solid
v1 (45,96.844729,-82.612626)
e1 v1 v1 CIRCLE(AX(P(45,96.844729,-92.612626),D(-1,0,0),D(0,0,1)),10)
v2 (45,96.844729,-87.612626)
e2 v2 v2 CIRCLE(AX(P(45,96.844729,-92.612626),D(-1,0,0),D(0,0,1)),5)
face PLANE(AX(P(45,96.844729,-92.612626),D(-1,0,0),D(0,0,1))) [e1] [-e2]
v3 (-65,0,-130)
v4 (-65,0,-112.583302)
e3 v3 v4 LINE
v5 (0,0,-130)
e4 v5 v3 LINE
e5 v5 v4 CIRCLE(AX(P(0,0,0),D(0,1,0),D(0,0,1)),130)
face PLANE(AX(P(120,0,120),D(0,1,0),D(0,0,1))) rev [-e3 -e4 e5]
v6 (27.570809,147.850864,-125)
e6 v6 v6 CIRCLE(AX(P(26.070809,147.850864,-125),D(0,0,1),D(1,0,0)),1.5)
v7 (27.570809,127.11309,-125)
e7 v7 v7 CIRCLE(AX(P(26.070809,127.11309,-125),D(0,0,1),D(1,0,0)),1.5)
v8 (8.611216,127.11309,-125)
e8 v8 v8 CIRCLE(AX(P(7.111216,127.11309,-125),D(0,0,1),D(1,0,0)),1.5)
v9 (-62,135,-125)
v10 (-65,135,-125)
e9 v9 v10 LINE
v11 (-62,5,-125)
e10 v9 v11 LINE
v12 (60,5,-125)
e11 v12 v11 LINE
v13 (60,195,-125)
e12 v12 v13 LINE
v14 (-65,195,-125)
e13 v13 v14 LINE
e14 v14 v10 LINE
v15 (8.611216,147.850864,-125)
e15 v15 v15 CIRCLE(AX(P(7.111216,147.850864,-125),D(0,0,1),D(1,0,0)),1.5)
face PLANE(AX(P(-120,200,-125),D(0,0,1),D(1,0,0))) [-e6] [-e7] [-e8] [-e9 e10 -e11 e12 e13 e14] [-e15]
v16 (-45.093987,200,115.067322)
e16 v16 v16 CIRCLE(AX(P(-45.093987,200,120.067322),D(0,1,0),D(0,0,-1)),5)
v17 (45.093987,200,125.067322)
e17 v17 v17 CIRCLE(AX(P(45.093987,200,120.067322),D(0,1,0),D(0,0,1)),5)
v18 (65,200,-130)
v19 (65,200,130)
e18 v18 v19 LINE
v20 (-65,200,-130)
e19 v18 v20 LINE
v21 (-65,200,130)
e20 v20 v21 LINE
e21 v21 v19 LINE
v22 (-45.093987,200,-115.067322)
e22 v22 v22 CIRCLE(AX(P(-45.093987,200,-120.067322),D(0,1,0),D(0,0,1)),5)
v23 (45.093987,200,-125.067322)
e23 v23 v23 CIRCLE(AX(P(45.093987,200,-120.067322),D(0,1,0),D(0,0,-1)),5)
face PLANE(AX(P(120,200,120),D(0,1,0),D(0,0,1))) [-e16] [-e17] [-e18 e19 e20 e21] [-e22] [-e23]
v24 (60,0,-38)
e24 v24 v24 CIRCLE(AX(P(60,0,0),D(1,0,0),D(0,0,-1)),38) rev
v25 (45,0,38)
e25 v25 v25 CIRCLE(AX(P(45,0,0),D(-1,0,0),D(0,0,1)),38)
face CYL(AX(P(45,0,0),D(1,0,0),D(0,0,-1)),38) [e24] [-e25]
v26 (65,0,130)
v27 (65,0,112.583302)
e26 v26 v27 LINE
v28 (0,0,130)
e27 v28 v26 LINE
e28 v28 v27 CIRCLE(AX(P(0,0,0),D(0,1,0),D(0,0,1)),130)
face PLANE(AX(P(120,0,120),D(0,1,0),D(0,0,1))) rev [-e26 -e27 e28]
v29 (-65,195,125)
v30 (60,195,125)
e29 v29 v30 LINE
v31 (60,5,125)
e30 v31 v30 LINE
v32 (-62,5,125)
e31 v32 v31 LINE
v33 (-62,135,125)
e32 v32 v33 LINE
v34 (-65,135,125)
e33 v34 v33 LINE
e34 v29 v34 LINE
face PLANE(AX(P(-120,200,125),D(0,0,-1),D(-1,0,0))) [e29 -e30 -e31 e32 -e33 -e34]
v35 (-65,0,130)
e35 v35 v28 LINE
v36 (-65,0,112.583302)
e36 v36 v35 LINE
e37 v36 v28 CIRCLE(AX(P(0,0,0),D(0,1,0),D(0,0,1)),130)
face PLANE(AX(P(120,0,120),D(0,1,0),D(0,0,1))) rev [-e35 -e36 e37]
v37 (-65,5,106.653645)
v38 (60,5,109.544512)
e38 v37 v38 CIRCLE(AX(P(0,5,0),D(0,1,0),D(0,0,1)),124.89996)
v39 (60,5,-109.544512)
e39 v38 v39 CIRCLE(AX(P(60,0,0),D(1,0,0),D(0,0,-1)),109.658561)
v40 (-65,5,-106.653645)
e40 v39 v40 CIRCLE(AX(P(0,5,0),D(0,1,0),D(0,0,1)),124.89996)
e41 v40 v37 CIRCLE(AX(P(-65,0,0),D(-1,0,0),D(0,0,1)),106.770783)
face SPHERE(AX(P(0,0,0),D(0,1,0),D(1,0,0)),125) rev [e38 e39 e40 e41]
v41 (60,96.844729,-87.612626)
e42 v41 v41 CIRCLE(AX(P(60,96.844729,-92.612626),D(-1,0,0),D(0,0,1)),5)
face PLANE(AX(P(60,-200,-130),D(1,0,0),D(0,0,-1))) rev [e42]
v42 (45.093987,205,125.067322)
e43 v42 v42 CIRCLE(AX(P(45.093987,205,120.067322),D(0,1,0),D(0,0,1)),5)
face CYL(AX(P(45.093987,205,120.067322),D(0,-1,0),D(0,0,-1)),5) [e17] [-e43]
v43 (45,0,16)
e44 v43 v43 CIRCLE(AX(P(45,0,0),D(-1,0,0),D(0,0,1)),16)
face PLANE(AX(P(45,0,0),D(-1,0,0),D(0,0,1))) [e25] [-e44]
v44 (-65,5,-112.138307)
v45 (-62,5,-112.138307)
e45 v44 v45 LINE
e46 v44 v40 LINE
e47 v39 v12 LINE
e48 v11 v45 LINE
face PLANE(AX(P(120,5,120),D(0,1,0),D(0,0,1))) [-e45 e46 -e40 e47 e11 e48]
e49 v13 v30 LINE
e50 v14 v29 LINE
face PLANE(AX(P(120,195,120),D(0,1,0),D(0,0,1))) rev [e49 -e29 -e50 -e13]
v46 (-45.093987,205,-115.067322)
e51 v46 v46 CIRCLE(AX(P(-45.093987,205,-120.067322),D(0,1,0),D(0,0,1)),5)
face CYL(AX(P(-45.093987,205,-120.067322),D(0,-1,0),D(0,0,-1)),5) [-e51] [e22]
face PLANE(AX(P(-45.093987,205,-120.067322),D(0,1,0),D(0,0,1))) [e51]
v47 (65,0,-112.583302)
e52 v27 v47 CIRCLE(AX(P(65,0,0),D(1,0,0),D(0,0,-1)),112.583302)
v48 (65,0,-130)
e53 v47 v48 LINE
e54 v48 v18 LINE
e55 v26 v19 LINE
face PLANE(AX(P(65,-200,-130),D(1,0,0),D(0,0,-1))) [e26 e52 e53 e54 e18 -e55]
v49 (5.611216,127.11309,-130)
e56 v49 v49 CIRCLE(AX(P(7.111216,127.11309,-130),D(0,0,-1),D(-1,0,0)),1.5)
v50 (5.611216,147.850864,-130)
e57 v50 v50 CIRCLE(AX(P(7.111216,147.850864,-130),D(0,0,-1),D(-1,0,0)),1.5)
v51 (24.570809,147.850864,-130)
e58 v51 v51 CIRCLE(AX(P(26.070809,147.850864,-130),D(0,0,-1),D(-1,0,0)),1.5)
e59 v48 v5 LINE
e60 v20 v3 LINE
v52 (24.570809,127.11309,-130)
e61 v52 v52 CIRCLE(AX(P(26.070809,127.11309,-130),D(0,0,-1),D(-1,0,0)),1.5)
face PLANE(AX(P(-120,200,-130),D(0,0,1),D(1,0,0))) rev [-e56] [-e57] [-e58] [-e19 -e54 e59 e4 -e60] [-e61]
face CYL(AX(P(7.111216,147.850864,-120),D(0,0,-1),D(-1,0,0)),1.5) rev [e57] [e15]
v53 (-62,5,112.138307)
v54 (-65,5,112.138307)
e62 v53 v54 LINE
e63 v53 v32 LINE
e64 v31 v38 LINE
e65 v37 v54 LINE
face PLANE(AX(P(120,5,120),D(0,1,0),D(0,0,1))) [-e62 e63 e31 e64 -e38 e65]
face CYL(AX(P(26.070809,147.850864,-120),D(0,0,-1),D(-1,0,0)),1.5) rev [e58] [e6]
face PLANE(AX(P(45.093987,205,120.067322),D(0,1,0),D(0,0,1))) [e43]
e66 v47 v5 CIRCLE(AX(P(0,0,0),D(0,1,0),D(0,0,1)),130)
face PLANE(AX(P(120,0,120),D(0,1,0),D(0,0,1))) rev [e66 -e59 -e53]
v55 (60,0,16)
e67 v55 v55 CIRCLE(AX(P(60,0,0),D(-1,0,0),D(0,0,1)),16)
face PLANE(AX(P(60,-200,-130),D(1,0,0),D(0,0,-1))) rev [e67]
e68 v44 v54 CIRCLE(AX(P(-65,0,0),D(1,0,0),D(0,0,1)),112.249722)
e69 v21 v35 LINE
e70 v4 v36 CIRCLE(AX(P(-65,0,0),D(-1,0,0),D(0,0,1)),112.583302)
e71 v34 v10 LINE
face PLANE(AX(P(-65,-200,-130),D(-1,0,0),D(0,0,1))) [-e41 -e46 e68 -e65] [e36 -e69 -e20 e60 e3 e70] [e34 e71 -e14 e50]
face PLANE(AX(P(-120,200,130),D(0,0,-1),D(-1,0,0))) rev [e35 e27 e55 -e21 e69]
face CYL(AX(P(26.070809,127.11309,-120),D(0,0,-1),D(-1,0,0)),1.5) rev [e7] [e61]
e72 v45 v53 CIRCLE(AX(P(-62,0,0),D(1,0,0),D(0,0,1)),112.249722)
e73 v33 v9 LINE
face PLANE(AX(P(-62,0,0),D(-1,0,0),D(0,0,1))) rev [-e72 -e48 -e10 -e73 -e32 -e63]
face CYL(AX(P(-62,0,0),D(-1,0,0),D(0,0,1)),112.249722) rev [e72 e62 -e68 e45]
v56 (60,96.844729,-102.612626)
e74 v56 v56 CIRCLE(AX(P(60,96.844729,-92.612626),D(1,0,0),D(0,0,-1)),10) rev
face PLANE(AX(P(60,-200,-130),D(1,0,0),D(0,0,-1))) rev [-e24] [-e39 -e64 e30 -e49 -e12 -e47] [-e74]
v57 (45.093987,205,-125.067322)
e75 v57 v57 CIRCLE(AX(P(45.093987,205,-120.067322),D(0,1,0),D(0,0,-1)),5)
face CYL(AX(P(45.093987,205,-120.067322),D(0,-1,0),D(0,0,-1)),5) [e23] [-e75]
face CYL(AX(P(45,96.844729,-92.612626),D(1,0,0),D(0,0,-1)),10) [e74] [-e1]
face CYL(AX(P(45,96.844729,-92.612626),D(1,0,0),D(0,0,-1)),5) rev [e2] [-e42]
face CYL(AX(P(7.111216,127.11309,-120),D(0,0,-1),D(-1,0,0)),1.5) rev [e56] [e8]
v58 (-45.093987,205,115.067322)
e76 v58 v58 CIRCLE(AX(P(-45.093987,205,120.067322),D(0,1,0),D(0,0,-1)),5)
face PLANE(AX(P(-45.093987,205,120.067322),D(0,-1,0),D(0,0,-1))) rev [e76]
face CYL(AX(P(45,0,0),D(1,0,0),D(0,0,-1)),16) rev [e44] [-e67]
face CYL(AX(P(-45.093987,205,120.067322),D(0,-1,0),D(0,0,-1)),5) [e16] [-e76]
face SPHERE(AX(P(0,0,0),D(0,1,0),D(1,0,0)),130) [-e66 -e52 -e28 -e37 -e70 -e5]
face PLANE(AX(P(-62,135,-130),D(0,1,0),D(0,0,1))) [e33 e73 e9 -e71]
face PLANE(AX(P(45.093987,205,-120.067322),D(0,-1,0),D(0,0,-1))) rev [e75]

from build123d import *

# Parameters (mm, degrees)
EXTRUDE_1_DEPTH           = 200
CUT_EXTRUDE_START         = -130
CUT_EXTRUDE_1_OUTLINE_W   = 315
CUT_EXTRUDE_1_OUTLINE_H   = 262
CUT_EXTRUDE_1_DEPTH       = 65
CUT_EXTRUDE_START_2       = 65
CUT_EXTRUDE_1_2_OUTLINE_W = 315
CUT_EXTRUDE_1_2_OUTLINE_H = 262
CUT_EXTRUDE_1_2_DEPTH     = 65
SHELL_START               = 5
SHELL_1_OUTLINE_W         = 125
SHELL_1_OUTLINE_H         = 250
SHELL_1_DEPTH             = 190
EXTRUDE_7_DEPTH           = 3
SKETCH_5_R                = 5
EXTRUDE_8_DEPTH           = 5
SKETCH_6_R                = 38
SKETCH_6_R_2              = 16
EXTRUDE_9_DEPTH           = 15
SKETCH_7_R                = 10
SKETCH_7_R_2              = 5
EXTRUDE_10_DEPTH          = 15
SKETCH_8_R                = 1.5
CUT_EXTRUDE_2_DEPTH       = 10


with BuildPart() as part:
    # 草图1 → 旋转1 (revolve)
    with BuildSketch(Plane.XY):
        with BuildLine():
            Line((0, 130), (0, -130))
            ThreePointArc((0, -130), (130, 0), (0, 130))
        make_face()
    revolve(axis=Axis((0, 130, 0), (0, -1, 0)))

    # 草图3 → 凸台-拉伸1 (add)
    with BuildSketch(Plane(origin=(0, 0, 0), x_dir=(1, 0, 0), z_dir=(0, 1, 0))):
        with BuildLine():
            Line((-120, -130), (120, -130))
            ThreePointArc((120, -130), (127.071067812, -127.071067812), (130, -120))
            Line((130, -120), (130, 120))
            ThreePointArc((130, 120), (127.071067812, 127.071067812), (120, 130))
            Line((120, 130), (-120, 130))
            ThreePointArc((-120, 130), (-127.071067812, 127.071067812), (-130, 120))
            Line((-130, 120), (-130, -120))
            ThreePointArc((-130, -120), (-127.071067812, -127.071067812), (-120, -130))
        make_face()
    extrude(amount=EXTRUDE_1_DEPTH)

    # 切除-拉伸1: read off the stored shape, not the designer's step
    # 切除-拉伸1 outline → 切除-拉伸1 (cut)
    with BuildSketch(Plane.YZ.offset(CUT_EXTRUDE_START)):
        with Locations((43.5, 0)):
            Rectangle(CUT_EXTRUDE_1_OUTLINE_W, CUT_EXTRUDE_1_OUTLINE_H)
    extrude(amount=CUT_EXTRUDE_1_DEPTH, mode=Mode.SUBTRACT)

    # Cut-Extrude 1 2 outline → Cut-Extrude 1 2 (cut)
    with BuildSketch(Plane.YZ.offset(CUT_EXTRUDE_START_2)):
        with Locations((43.5, 0)):
            Rectangle(CUT_EXTRUDE_1_2_OUTLINE_W, CUT_EXTRUDE_1_2_OUTLINE_H)
    extrude(amount=CUT_EXTRUDE_1_2_DEPTH, mode=Mode.SUBTRACT)

    # 抽壳1: read off the stored shape, not the designer's step
    # 抽壳1 outline → 抽壳1 (cut)
    with BuildSketch(Plane(origin=(0, 0, 0), x_dir=(1, 0, 0), z_dir=(0, 1, 0)).offset(SHELL_START)):
        with Locations((-2.5, 0)):
            Rectangle(SHELL_1_OUTLINE_W, SHELL_1_OUTLINE_H)
    extrude(amount=SHELL_1_DEPTH, mode=Mode.SUBTRACT)

    # Shell 1 2 outline → Shell 1 2 (revolve, cut)
    with BuildSketch(Plane.YX):
        with BuildLine():
            Line((109.658560943, 60.0000001), (0, 60.000000075))
            Line((0, 60.000000075), (0, -65.0000001))
            Line((0, -65.0000001), (106.770782459, -65.0000001))
            ThreePointArc((106.770782459, -65.0000001), (124.966656288, -2.887008165), (109.658560943, 60.0000001))
        make_face()
    revolve(axis=Axis((0, 0, 0), (1, 0, 0)), mode=Mode.SUBTRACT)

    # 草图4 → 凸台-拉伸7 (add)
    with BuildSketch(Plane.ZY.offset(65)):
        with BuildLine():
            Line((-130, 135), (-130, 0))
            Line((-130, 0), (-112.249721603, 0))
            ThreePointArc((-112.249721603, 0), (0, 112.249721603), (112.249721603, 0))
            Line((112.249721603, 0), (130, 0))
            Line((130, 0), (130, 135))
            Line((130, 135), (-130, 135))
        make_face()
    extrude(amount=-EXTRUDE_7_DEPTH)

    # 草图5 → 凸台-拉伸8 (add)
    with BuildSketch(Plane(origin=(0, 200, 0), x_dir=(1, 0, 0), z_dir=(0, 1, 0))):
        with Locations(Location((-45.093986565, 120.067321952, 0), (0, 0, 270))):
            Circle(SKETCH_5_R)
        with Locations(Location((-45.093986565, -120.067321952, 0), (0, 0, 90))):
            Circle(SKETCH_5_R)
        with Locations(Location((45.093986565, -120.067321952, 0), (0, 0, 270))):
            Circle(SKETCH_5_R)
        with Locations(Location((45.093986565, 120.067321952, 0), (0, 0, 90))):
            Circle(SKETCH_5_R)
    extrude(amount=EXTRUDE_8_DEPTH)

    # 草图6 → 凸台-拉伸9 (add)
    with BuildSketch(Plane.ZY.offset(-60)):
        with Locations(Location((0, 0, 0), (0, 0, 180))):
            Circle(SKETCH_6_R)
        Circle(SKETCH_6_R_2, mode=Mode.SUBTRACT)
    extrude(amount=EXTRUDE_9_DEPTH)

    # 草图7 → 凸台-拉伸10 (add)
    with BuildSketch(Plane.ZY.offset(-60)):
        with Locations(Location((-92.612625974, 96.844728871, 0), (0, 0, 180))):
            Circle(SKETCH_7_R)
        with Locations((-92.612625974, 96.844728871)):
            Circle(SKETCH_7_R_2, mode=Mode.SUBTRACT)
    extrude(amount=EXTRUDE_10_DEPTH)

    # 草图8 → 切除-拉伸2 (cut)
    with BuildSketch(Plane(origin=(0, 0, -130), x_dir=(-1, 0, 0), z_dir=(0, 0, -1))):
        with Locations((-26.070809392, 147.850864108)):
            Circle(SKETCH_8_R)
        with Locations((-7.111216047, 147.850864108)):
            Circle(SKETCH_8_R)
        with Locations((-26.070809392, 127.113089979)):
            Circle(SKETCH_8_R)
        with Locations((-7.111216047, 127.113089979)):
            Circle(SKETCH_8_R)
    extrude(amount=-CUT_EXTRUDE_2_DEPTH, mode=Mode.SUBTRACT)


solid = part.part
